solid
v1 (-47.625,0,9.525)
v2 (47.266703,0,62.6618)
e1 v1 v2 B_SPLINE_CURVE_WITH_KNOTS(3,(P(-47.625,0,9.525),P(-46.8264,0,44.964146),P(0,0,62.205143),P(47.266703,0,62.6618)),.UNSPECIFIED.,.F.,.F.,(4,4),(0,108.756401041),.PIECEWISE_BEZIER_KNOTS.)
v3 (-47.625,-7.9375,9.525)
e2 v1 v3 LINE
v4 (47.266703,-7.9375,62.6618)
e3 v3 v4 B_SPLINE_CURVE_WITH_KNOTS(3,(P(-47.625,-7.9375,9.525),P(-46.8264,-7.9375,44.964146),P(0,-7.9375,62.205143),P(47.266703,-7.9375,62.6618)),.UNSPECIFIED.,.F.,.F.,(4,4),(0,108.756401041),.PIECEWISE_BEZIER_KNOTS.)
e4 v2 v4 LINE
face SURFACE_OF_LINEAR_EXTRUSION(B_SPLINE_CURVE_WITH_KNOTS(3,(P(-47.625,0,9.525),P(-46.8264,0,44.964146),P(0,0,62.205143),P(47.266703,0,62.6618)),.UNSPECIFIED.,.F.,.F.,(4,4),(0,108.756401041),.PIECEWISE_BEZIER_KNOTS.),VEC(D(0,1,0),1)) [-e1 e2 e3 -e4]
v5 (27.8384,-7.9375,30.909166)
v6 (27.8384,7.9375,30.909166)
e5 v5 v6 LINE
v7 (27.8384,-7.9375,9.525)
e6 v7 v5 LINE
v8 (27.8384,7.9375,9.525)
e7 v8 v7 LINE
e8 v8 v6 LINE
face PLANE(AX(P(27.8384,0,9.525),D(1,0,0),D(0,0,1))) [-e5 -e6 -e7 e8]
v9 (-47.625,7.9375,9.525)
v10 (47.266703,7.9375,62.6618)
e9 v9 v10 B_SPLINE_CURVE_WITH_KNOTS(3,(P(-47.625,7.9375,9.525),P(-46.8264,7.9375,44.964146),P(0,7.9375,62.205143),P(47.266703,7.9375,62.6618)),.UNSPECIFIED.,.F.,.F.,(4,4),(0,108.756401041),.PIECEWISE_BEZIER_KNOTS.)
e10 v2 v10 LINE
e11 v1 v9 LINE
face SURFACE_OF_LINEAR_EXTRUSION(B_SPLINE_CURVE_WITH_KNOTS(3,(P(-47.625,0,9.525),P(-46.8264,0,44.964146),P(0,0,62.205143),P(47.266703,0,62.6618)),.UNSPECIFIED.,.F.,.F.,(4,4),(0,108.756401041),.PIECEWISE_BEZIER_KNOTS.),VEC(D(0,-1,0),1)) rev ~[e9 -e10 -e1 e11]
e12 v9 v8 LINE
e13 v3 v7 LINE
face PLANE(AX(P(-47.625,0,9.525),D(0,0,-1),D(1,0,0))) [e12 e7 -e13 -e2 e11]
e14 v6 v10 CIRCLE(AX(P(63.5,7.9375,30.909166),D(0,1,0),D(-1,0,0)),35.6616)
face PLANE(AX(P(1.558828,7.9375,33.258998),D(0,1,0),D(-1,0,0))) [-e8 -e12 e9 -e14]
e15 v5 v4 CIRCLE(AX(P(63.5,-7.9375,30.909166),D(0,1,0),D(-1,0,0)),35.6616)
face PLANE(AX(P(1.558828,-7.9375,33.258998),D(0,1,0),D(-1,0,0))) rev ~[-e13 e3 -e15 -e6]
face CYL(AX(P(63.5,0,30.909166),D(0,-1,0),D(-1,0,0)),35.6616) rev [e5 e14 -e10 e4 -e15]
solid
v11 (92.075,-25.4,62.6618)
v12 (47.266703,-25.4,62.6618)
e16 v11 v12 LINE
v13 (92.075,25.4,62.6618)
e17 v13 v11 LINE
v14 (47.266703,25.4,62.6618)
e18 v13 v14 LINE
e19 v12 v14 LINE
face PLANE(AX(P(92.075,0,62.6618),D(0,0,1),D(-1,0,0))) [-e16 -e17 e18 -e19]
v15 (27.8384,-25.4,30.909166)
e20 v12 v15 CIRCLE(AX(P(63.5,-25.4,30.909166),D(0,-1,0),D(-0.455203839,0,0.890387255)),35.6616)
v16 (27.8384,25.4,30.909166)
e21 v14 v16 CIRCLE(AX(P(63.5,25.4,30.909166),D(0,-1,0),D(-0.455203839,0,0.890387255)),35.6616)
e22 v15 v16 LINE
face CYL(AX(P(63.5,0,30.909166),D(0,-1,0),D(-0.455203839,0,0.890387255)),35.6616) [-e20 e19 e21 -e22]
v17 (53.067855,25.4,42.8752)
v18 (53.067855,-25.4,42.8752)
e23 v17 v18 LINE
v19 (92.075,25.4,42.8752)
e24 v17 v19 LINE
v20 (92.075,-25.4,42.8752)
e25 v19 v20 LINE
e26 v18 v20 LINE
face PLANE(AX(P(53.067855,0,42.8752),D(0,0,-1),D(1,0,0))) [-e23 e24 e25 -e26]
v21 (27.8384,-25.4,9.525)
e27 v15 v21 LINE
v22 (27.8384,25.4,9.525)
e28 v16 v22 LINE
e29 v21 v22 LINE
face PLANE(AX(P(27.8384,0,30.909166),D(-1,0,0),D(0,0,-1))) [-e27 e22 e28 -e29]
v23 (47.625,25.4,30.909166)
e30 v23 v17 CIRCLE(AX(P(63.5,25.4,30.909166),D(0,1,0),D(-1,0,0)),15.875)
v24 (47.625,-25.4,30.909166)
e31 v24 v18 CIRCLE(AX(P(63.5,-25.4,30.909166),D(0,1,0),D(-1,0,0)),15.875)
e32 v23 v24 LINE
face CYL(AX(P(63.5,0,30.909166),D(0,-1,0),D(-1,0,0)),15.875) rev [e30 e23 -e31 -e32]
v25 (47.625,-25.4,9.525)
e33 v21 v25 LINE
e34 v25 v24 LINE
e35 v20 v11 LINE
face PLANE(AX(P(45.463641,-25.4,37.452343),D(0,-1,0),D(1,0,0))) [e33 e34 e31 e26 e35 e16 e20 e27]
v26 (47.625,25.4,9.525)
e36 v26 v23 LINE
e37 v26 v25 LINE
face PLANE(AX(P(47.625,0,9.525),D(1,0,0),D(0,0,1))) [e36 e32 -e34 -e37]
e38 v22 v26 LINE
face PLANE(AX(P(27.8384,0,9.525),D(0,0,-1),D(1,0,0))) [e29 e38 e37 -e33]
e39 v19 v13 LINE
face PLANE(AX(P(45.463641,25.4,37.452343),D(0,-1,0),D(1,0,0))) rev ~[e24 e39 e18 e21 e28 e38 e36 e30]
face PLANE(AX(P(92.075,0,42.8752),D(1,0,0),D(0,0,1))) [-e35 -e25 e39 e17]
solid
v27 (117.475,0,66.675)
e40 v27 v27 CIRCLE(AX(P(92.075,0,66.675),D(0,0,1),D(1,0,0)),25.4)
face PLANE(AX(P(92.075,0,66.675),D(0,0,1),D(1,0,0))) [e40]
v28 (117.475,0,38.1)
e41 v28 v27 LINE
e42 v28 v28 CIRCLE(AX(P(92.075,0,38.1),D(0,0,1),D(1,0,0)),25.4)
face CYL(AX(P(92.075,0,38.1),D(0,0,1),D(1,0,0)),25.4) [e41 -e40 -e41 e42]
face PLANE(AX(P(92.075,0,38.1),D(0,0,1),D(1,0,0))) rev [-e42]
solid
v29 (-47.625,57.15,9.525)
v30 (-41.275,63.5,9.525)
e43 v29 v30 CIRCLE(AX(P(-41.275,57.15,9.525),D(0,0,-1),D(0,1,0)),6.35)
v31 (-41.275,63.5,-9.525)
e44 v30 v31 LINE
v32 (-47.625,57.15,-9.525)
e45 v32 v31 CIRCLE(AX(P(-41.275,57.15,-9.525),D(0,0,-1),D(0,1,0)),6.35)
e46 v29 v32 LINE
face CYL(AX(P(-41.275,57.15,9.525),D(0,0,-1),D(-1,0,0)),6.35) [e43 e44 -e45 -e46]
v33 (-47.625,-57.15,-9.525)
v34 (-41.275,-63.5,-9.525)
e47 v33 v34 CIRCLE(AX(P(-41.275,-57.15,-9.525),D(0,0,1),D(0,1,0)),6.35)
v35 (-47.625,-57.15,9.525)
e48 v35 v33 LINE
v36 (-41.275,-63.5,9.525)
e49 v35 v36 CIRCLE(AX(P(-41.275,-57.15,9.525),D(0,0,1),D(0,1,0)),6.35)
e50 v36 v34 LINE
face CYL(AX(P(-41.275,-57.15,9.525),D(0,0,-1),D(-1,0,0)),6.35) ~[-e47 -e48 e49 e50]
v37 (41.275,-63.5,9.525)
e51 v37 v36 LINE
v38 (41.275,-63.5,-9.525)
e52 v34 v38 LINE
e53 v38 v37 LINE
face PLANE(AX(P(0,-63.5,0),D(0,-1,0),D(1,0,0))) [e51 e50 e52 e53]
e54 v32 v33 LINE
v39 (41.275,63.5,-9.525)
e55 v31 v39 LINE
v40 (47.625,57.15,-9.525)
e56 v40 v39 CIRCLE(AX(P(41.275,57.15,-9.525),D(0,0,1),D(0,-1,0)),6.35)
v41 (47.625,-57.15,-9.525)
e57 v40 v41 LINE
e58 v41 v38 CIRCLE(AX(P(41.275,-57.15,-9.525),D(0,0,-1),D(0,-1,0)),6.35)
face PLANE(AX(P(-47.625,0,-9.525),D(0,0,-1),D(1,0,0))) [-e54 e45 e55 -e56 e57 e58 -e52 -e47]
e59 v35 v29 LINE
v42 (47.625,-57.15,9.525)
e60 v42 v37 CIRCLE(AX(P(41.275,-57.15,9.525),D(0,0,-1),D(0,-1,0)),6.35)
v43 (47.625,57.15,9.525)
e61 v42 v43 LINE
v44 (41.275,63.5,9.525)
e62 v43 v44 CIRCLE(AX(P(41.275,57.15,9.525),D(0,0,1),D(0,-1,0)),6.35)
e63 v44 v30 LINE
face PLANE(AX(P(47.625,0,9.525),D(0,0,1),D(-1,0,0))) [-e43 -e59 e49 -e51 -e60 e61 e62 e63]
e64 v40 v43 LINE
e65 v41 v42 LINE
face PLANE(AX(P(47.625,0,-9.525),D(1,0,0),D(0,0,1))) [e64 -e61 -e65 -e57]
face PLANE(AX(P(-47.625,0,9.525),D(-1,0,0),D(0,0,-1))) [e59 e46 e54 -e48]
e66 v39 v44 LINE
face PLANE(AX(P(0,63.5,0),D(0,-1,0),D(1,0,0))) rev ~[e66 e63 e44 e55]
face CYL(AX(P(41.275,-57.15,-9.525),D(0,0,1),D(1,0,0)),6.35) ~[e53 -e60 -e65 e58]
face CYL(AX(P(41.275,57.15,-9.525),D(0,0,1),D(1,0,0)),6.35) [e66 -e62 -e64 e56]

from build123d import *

# Parameters (mm, degrees)
F1_DEPTH = 63.5
F0_W     = 25.4
F0_H     = 19.7866
F2_DEPTH = 25.4
F3_DEPTH = 7.9375
F5_R     = 6.35


# Not quite as in the source:
# - a feature names something its author has since deleted; it is built from what else it names


with BuildPart() as f1:
    # F0 (on Front) → F1 (new body, symmetric)
    with BuildSketch(Plane.XZ):
        Polygon((-47.625, 9.525), (-47.625, -9.525), (47.625, -9.525), (47.625, 9.525), (27.8384, 9.525), align=None)
    extrude(amount=F1_DEPTH, both=True)

    # F5
    f5_edges = [f1.edges().sort_by_distance(p)[0] for p in [
        (47.625, -63.5, 0),
        (-47.625, -63.5, 0),
        (-47.625, 63.5, 0),
        (47.625, 63.5, 0),
    ]]
    fillet(f5_edges, radius=F5_R)


with BuildPart() as f2:
    # F0 (on Front) → F2 (new body, symmetric)
    with BuildSketch(Plane.XZ):
        with BuildLine():
            Line((27.8384, 9.525), (47.625, 9.525))
            Line((47.625, 9.525), (47.625, 30.9091658516))
            ThreePointArc((47.625, 30.9091658516), (49.0496379155, 37.4820389393), (53.0678548822, 42.8752))
            Line((53.0678548822, 42.8752), (66.675, 42.8752))
            Line((66.675, 42.8752), (66.675, 62.6618))
            Line((66.675, 62.6618), (47.2667027627, 62.6618))
            ThreePointArc((47.2667027627, 62.6618), (33.0808032049, 49.5215859226), (27.8384, 30.9091658516))
            Line((27.8384, 30.9091658516), (27.8384, 9.525))
        make_face()
        with Locations((79.375, 52.7685)):
            Rectangle(F0_W, F0_H)
    extrude(amount=F2_DEPTH, both=True)


with BuildPart() as f3:
    # F0 (on Front) → F3 (new body, symmetric)
    with BuildSketch(Plane.XZ):
        with BuildLine():
            add(Edge.make_bspline(
                [(-47.625, 9.525), (-46.8263998628, 44.964145869), (0, 62.2051432729), (47.2667027627, 62.6618)],
                knots=[0, 0, 0, 0, 108.7564010412, 108.7564010412, 108.7564010412, 108.7564010412], degree=3))
            Line((-47.625, 9.525), (27.8384, 9.525))
            Line((27.8384, 9.525), (27.8384, 30.9091658516))
            ThreePointArc((27.8384, 30.9091658516), (33.0808032049, 49.5215859226), (47.2667027627, 62.6618))
        make_face()
    extrude(amount=F3_DEPTH, both=True)


with BuildPart() as f4:
    # F0 (on Front) → F4 (revolve)
    with BuildSketch(Plane.XZ):
        Polygon((92.075, 66.675), (92.075, 62.6618), (92.075, 42.8752), (92.075, 38.1), (117.475, 38.1), (117.475, 66.675), align=None)
    revolve(axis=Axis((92.075, 0, 52.3875), (0, 0, 1)))


solid = Compound([f1.part, f2.part, f3.part, f4.part])
